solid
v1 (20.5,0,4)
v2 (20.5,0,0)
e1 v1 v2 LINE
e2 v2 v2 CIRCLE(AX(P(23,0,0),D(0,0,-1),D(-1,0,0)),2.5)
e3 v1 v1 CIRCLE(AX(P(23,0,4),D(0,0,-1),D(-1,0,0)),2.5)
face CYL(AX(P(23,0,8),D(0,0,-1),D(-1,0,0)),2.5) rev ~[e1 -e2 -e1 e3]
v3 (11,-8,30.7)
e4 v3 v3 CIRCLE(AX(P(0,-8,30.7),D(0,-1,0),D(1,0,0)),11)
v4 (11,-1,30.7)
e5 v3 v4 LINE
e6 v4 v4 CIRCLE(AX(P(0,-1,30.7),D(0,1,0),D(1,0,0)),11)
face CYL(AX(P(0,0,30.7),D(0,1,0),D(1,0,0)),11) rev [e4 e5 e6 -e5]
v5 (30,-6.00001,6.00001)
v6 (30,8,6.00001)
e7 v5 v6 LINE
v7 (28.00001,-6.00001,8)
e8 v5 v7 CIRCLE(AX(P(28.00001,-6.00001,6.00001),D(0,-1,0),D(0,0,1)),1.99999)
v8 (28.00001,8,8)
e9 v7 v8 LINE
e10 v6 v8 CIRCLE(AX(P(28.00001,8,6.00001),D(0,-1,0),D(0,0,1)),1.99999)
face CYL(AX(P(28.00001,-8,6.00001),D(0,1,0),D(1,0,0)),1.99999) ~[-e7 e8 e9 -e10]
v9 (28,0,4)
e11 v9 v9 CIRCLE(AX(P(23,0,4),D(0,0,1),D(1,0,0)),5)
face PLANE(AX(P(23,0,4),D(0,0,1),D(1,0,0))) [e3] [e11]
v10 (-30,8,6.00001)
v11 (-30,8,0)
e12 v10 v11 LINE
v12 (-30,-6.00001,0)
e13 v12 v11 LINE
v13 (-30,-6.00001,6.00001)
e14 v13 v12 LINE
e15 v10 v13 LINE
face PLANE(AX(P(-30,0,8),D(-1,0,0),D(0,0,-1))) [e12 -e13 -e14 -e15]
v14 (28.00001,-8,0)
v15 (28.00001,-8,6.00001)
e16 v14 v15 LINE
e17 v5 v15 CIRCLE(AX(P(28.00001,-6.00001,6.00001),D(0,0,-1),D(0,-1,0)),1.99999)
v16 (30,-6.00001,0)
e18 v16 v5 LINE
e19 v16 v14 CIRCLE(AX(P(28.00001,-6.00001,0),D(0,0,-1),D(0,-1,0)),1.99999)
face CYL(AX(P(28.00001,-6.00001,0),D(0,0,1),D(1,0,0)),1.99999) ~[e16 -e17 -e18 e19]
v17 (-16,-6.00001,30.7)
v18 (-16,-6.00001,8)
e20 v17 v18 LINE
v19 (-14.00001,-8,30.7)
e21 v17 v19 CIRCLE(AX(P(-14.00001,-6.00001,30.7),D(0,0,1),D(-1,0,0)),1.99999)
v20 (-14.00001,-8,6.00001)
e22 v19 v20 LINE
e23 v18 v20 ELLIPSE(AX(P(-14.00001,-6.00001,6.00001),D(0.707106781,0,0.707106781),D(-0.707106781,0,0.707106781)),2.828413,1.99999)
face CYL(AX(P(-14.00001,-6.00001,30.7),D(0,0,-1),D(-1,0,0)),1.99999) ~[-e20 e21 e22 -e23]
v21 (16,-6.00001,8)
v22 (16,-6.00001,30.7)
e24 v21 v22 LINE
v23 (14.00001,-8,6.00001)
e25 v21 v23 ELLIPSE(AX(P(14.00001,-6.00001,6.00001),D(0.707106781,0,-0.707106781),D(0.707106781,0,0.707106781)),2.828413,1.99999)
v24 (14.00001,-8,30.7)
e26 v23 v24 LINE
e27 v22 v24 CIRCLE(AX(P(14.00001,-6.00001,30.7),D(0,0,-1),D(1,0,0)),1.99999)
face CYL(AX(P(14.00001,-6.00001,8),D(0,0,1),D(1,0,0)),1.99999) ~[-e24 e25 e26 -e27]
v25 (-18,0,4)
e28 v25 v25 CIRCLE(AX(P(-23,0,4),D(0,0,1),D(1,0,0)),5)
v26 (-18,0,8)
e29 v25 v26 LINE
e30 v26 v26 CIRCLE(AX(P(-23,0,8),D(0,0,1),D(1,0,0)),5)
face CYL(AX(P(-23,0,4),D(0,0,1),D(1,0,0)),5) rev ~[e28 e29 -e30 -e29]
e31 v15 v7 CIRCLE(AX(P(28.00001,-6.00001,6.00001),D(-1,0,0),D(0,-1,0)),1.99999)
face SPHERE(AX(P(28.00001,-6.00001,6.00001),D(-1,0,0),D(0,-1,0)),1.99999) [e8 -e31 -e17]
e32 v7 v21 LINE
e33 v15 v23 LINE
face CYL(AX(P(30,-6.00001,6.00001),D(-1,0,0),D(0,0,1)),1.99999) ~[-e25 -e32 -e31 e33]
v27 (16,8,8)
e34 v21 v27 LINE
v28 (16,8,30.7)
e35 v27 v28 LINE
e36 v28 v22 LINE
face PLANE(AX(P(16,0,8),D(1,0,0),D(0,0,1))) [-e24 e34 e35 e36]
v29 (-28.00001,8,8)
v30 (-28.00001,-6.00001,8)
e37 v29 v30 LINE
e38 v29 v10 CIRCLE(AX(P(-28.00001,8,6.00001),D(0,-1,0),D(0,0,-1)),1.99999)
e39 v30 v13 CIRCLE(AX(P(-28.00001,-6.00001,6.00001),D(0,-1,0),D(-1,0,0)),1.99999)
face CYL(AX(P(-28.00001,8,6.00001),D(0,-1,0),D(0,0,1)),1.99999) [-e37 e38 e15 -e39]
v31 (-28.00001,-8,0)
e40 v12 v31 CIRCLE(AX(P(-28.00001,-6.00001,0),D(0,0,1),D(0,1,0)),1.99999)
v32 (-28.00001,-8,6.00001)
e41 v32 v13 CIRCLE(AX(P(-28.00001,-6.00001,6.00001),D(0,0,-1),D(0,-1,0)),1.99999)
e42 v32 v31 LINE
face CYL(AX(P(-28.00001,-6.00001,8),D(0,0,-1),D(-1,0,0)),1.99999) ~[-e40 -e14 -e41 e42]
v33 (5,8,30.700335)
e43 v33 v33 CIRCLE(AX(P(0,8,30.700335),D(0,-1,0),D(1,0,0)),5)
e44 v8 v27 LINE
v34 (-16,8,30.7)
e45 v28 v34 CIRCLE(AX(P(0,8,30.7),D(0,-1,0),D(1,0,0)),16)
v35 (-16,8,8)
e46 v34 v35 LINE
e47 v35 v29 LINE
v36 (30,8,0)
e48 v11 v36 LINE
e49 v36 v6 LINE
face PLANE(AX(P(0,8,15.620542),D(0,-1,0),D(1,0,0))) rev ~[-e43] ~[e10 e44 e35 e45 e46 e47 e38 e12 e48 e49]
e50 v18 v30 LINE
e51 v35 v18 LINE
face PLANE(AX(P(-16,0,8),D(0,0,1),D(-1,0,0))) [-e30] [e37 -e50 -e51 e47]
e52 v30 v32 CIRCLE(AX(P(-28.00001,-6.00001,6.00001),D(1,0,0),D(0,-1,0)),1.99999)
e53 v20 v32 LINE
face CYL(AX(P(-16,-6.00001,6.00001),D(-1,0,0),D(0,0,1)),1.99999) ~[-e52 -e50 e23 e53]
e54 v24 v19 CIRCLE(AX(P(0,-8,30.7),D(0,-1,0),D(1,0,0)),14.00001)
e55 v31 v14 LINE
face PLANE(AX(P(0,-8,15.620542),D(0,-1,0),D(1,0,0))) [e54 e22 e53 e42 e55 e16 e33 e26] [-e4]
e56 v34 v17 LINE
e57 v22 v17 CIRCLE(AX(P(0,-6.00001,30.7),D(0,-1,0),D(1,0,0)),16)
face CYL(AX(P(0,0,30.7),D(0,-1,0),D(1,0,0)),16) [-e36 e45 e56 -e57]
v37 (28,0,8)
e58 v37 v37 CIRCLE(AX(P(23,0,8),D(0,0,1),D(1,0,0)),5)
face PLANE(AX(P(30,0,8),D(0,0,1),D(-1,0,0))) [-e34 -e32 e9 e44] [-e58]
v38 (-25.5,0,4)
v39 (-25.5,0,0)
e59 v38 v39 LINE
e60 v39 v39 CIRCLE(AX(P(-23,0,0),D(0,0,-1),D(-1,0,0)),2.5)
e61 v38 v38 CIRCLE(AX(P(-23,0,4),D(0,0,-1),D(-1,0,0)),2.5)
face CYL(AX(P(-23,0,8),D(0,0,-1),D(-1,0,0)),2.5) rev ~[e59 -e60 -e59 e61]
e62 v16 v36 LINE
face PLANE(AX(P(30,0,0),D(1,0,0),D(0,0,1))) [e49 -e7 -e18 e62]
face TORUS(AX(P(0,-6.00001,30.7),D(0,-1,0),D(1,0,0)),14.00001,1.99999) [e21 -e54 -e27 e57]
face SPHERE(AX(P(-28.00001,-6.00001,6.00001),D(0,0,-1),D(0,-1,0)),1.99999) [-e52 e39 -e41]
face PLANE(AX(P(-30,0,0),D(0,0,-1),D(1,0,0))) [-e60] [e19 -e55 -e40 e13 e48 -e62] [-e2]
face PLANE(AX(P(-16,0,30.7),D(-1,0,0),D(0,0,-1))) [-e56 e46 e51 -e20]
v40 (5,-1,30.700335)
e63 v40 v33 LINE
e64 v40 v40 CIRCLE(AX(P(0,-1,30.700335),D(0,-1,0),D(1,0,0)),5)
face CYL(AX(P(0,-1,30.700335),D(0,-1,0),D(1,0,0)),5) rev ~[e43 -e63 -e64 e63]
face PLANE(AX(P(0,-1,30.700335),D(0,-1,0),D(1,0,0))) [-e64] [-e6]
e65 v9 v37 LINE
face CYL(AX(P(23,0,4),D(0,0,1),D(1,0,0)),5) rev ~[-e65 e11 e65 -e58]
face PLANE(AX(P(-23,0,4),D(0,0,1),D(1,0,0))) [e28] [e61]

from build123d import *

# Parameters (mm, degrees)
F0_R           = 11
F1_DEPTH       = 8
F3_R           = 11.4612754368
F3_R_2         = 5
F4_DEPTH       = 9
F6_D           = 5
F6_CBORE_D     = 10
F6_CBORE_DEPTH = 4
F7_R           = 1.99999


# Not quite as in the source:
# - a fillet or chamfer is up to 0.001 mm smaller than in the source, because OpenCascade refuses the exact size


with BuildPart() as f1:
    # F0 (on Front) → F1 (new body, symmetric)
    with BuildSketch(Plane.XZ):
        with BuildLine():
            Line((16, 8), (16, 30.7))
            ThreePointArc((16, 30.7), (0, 46.7), (-16, 30.7))
            Line((-16, 30.7), (-16, 8))
            Line((-16, 8), (-30, 8))
            Line((-30, 8), (-30, 0))
            Line((-30, 0), (30, 0))
            Line((30, 0), (30, 8))
            Line((30, 8), (16, 8))
        make_face()
        with Locations((0, 30.7)):
            Circle(F0_R, mode=Mode.SUBTRACT)
    extrude(amount=F1_DEPTH, both=True)

    # F3 (on offset) → F4 (join)
    with BuildSketch(Plane.XZ.offset(1)):
        with Locations((0, 30.7003352791)):
            Circle(F3_R)
        with Locations((0, 30.7003352791)):
            Circle(F3_R_2, mode=Mode.SUBTRACT)
    extrude(amount=-F4_DEPTH)

    # F6 (through all)
    with Locations(Plane.XY.offset(8)):
        with Locations((-23, 0), (23, 0)):
            CounterBoreHole(F6_D / 2, F6_CBORE_D / 2, F6_CBORE_DEPTH)

    # F7 (radius 2 in the source; OpenCascade refuses exactly that, so slightly less here)
    f7_edges = [f1.edges().sort_by_distance(p)[0] for p in [
        (-30, -8, 4),
        (-23, -8, 8),
        (-16, -8, 19.35),
        (23, -8, 8),
        (30, -8, 4),
        (-30, 0, 8),
        (30, 0, 8),
    ]]
    fillet(f7_edges, radius=F7_R)


solid = f1.part
